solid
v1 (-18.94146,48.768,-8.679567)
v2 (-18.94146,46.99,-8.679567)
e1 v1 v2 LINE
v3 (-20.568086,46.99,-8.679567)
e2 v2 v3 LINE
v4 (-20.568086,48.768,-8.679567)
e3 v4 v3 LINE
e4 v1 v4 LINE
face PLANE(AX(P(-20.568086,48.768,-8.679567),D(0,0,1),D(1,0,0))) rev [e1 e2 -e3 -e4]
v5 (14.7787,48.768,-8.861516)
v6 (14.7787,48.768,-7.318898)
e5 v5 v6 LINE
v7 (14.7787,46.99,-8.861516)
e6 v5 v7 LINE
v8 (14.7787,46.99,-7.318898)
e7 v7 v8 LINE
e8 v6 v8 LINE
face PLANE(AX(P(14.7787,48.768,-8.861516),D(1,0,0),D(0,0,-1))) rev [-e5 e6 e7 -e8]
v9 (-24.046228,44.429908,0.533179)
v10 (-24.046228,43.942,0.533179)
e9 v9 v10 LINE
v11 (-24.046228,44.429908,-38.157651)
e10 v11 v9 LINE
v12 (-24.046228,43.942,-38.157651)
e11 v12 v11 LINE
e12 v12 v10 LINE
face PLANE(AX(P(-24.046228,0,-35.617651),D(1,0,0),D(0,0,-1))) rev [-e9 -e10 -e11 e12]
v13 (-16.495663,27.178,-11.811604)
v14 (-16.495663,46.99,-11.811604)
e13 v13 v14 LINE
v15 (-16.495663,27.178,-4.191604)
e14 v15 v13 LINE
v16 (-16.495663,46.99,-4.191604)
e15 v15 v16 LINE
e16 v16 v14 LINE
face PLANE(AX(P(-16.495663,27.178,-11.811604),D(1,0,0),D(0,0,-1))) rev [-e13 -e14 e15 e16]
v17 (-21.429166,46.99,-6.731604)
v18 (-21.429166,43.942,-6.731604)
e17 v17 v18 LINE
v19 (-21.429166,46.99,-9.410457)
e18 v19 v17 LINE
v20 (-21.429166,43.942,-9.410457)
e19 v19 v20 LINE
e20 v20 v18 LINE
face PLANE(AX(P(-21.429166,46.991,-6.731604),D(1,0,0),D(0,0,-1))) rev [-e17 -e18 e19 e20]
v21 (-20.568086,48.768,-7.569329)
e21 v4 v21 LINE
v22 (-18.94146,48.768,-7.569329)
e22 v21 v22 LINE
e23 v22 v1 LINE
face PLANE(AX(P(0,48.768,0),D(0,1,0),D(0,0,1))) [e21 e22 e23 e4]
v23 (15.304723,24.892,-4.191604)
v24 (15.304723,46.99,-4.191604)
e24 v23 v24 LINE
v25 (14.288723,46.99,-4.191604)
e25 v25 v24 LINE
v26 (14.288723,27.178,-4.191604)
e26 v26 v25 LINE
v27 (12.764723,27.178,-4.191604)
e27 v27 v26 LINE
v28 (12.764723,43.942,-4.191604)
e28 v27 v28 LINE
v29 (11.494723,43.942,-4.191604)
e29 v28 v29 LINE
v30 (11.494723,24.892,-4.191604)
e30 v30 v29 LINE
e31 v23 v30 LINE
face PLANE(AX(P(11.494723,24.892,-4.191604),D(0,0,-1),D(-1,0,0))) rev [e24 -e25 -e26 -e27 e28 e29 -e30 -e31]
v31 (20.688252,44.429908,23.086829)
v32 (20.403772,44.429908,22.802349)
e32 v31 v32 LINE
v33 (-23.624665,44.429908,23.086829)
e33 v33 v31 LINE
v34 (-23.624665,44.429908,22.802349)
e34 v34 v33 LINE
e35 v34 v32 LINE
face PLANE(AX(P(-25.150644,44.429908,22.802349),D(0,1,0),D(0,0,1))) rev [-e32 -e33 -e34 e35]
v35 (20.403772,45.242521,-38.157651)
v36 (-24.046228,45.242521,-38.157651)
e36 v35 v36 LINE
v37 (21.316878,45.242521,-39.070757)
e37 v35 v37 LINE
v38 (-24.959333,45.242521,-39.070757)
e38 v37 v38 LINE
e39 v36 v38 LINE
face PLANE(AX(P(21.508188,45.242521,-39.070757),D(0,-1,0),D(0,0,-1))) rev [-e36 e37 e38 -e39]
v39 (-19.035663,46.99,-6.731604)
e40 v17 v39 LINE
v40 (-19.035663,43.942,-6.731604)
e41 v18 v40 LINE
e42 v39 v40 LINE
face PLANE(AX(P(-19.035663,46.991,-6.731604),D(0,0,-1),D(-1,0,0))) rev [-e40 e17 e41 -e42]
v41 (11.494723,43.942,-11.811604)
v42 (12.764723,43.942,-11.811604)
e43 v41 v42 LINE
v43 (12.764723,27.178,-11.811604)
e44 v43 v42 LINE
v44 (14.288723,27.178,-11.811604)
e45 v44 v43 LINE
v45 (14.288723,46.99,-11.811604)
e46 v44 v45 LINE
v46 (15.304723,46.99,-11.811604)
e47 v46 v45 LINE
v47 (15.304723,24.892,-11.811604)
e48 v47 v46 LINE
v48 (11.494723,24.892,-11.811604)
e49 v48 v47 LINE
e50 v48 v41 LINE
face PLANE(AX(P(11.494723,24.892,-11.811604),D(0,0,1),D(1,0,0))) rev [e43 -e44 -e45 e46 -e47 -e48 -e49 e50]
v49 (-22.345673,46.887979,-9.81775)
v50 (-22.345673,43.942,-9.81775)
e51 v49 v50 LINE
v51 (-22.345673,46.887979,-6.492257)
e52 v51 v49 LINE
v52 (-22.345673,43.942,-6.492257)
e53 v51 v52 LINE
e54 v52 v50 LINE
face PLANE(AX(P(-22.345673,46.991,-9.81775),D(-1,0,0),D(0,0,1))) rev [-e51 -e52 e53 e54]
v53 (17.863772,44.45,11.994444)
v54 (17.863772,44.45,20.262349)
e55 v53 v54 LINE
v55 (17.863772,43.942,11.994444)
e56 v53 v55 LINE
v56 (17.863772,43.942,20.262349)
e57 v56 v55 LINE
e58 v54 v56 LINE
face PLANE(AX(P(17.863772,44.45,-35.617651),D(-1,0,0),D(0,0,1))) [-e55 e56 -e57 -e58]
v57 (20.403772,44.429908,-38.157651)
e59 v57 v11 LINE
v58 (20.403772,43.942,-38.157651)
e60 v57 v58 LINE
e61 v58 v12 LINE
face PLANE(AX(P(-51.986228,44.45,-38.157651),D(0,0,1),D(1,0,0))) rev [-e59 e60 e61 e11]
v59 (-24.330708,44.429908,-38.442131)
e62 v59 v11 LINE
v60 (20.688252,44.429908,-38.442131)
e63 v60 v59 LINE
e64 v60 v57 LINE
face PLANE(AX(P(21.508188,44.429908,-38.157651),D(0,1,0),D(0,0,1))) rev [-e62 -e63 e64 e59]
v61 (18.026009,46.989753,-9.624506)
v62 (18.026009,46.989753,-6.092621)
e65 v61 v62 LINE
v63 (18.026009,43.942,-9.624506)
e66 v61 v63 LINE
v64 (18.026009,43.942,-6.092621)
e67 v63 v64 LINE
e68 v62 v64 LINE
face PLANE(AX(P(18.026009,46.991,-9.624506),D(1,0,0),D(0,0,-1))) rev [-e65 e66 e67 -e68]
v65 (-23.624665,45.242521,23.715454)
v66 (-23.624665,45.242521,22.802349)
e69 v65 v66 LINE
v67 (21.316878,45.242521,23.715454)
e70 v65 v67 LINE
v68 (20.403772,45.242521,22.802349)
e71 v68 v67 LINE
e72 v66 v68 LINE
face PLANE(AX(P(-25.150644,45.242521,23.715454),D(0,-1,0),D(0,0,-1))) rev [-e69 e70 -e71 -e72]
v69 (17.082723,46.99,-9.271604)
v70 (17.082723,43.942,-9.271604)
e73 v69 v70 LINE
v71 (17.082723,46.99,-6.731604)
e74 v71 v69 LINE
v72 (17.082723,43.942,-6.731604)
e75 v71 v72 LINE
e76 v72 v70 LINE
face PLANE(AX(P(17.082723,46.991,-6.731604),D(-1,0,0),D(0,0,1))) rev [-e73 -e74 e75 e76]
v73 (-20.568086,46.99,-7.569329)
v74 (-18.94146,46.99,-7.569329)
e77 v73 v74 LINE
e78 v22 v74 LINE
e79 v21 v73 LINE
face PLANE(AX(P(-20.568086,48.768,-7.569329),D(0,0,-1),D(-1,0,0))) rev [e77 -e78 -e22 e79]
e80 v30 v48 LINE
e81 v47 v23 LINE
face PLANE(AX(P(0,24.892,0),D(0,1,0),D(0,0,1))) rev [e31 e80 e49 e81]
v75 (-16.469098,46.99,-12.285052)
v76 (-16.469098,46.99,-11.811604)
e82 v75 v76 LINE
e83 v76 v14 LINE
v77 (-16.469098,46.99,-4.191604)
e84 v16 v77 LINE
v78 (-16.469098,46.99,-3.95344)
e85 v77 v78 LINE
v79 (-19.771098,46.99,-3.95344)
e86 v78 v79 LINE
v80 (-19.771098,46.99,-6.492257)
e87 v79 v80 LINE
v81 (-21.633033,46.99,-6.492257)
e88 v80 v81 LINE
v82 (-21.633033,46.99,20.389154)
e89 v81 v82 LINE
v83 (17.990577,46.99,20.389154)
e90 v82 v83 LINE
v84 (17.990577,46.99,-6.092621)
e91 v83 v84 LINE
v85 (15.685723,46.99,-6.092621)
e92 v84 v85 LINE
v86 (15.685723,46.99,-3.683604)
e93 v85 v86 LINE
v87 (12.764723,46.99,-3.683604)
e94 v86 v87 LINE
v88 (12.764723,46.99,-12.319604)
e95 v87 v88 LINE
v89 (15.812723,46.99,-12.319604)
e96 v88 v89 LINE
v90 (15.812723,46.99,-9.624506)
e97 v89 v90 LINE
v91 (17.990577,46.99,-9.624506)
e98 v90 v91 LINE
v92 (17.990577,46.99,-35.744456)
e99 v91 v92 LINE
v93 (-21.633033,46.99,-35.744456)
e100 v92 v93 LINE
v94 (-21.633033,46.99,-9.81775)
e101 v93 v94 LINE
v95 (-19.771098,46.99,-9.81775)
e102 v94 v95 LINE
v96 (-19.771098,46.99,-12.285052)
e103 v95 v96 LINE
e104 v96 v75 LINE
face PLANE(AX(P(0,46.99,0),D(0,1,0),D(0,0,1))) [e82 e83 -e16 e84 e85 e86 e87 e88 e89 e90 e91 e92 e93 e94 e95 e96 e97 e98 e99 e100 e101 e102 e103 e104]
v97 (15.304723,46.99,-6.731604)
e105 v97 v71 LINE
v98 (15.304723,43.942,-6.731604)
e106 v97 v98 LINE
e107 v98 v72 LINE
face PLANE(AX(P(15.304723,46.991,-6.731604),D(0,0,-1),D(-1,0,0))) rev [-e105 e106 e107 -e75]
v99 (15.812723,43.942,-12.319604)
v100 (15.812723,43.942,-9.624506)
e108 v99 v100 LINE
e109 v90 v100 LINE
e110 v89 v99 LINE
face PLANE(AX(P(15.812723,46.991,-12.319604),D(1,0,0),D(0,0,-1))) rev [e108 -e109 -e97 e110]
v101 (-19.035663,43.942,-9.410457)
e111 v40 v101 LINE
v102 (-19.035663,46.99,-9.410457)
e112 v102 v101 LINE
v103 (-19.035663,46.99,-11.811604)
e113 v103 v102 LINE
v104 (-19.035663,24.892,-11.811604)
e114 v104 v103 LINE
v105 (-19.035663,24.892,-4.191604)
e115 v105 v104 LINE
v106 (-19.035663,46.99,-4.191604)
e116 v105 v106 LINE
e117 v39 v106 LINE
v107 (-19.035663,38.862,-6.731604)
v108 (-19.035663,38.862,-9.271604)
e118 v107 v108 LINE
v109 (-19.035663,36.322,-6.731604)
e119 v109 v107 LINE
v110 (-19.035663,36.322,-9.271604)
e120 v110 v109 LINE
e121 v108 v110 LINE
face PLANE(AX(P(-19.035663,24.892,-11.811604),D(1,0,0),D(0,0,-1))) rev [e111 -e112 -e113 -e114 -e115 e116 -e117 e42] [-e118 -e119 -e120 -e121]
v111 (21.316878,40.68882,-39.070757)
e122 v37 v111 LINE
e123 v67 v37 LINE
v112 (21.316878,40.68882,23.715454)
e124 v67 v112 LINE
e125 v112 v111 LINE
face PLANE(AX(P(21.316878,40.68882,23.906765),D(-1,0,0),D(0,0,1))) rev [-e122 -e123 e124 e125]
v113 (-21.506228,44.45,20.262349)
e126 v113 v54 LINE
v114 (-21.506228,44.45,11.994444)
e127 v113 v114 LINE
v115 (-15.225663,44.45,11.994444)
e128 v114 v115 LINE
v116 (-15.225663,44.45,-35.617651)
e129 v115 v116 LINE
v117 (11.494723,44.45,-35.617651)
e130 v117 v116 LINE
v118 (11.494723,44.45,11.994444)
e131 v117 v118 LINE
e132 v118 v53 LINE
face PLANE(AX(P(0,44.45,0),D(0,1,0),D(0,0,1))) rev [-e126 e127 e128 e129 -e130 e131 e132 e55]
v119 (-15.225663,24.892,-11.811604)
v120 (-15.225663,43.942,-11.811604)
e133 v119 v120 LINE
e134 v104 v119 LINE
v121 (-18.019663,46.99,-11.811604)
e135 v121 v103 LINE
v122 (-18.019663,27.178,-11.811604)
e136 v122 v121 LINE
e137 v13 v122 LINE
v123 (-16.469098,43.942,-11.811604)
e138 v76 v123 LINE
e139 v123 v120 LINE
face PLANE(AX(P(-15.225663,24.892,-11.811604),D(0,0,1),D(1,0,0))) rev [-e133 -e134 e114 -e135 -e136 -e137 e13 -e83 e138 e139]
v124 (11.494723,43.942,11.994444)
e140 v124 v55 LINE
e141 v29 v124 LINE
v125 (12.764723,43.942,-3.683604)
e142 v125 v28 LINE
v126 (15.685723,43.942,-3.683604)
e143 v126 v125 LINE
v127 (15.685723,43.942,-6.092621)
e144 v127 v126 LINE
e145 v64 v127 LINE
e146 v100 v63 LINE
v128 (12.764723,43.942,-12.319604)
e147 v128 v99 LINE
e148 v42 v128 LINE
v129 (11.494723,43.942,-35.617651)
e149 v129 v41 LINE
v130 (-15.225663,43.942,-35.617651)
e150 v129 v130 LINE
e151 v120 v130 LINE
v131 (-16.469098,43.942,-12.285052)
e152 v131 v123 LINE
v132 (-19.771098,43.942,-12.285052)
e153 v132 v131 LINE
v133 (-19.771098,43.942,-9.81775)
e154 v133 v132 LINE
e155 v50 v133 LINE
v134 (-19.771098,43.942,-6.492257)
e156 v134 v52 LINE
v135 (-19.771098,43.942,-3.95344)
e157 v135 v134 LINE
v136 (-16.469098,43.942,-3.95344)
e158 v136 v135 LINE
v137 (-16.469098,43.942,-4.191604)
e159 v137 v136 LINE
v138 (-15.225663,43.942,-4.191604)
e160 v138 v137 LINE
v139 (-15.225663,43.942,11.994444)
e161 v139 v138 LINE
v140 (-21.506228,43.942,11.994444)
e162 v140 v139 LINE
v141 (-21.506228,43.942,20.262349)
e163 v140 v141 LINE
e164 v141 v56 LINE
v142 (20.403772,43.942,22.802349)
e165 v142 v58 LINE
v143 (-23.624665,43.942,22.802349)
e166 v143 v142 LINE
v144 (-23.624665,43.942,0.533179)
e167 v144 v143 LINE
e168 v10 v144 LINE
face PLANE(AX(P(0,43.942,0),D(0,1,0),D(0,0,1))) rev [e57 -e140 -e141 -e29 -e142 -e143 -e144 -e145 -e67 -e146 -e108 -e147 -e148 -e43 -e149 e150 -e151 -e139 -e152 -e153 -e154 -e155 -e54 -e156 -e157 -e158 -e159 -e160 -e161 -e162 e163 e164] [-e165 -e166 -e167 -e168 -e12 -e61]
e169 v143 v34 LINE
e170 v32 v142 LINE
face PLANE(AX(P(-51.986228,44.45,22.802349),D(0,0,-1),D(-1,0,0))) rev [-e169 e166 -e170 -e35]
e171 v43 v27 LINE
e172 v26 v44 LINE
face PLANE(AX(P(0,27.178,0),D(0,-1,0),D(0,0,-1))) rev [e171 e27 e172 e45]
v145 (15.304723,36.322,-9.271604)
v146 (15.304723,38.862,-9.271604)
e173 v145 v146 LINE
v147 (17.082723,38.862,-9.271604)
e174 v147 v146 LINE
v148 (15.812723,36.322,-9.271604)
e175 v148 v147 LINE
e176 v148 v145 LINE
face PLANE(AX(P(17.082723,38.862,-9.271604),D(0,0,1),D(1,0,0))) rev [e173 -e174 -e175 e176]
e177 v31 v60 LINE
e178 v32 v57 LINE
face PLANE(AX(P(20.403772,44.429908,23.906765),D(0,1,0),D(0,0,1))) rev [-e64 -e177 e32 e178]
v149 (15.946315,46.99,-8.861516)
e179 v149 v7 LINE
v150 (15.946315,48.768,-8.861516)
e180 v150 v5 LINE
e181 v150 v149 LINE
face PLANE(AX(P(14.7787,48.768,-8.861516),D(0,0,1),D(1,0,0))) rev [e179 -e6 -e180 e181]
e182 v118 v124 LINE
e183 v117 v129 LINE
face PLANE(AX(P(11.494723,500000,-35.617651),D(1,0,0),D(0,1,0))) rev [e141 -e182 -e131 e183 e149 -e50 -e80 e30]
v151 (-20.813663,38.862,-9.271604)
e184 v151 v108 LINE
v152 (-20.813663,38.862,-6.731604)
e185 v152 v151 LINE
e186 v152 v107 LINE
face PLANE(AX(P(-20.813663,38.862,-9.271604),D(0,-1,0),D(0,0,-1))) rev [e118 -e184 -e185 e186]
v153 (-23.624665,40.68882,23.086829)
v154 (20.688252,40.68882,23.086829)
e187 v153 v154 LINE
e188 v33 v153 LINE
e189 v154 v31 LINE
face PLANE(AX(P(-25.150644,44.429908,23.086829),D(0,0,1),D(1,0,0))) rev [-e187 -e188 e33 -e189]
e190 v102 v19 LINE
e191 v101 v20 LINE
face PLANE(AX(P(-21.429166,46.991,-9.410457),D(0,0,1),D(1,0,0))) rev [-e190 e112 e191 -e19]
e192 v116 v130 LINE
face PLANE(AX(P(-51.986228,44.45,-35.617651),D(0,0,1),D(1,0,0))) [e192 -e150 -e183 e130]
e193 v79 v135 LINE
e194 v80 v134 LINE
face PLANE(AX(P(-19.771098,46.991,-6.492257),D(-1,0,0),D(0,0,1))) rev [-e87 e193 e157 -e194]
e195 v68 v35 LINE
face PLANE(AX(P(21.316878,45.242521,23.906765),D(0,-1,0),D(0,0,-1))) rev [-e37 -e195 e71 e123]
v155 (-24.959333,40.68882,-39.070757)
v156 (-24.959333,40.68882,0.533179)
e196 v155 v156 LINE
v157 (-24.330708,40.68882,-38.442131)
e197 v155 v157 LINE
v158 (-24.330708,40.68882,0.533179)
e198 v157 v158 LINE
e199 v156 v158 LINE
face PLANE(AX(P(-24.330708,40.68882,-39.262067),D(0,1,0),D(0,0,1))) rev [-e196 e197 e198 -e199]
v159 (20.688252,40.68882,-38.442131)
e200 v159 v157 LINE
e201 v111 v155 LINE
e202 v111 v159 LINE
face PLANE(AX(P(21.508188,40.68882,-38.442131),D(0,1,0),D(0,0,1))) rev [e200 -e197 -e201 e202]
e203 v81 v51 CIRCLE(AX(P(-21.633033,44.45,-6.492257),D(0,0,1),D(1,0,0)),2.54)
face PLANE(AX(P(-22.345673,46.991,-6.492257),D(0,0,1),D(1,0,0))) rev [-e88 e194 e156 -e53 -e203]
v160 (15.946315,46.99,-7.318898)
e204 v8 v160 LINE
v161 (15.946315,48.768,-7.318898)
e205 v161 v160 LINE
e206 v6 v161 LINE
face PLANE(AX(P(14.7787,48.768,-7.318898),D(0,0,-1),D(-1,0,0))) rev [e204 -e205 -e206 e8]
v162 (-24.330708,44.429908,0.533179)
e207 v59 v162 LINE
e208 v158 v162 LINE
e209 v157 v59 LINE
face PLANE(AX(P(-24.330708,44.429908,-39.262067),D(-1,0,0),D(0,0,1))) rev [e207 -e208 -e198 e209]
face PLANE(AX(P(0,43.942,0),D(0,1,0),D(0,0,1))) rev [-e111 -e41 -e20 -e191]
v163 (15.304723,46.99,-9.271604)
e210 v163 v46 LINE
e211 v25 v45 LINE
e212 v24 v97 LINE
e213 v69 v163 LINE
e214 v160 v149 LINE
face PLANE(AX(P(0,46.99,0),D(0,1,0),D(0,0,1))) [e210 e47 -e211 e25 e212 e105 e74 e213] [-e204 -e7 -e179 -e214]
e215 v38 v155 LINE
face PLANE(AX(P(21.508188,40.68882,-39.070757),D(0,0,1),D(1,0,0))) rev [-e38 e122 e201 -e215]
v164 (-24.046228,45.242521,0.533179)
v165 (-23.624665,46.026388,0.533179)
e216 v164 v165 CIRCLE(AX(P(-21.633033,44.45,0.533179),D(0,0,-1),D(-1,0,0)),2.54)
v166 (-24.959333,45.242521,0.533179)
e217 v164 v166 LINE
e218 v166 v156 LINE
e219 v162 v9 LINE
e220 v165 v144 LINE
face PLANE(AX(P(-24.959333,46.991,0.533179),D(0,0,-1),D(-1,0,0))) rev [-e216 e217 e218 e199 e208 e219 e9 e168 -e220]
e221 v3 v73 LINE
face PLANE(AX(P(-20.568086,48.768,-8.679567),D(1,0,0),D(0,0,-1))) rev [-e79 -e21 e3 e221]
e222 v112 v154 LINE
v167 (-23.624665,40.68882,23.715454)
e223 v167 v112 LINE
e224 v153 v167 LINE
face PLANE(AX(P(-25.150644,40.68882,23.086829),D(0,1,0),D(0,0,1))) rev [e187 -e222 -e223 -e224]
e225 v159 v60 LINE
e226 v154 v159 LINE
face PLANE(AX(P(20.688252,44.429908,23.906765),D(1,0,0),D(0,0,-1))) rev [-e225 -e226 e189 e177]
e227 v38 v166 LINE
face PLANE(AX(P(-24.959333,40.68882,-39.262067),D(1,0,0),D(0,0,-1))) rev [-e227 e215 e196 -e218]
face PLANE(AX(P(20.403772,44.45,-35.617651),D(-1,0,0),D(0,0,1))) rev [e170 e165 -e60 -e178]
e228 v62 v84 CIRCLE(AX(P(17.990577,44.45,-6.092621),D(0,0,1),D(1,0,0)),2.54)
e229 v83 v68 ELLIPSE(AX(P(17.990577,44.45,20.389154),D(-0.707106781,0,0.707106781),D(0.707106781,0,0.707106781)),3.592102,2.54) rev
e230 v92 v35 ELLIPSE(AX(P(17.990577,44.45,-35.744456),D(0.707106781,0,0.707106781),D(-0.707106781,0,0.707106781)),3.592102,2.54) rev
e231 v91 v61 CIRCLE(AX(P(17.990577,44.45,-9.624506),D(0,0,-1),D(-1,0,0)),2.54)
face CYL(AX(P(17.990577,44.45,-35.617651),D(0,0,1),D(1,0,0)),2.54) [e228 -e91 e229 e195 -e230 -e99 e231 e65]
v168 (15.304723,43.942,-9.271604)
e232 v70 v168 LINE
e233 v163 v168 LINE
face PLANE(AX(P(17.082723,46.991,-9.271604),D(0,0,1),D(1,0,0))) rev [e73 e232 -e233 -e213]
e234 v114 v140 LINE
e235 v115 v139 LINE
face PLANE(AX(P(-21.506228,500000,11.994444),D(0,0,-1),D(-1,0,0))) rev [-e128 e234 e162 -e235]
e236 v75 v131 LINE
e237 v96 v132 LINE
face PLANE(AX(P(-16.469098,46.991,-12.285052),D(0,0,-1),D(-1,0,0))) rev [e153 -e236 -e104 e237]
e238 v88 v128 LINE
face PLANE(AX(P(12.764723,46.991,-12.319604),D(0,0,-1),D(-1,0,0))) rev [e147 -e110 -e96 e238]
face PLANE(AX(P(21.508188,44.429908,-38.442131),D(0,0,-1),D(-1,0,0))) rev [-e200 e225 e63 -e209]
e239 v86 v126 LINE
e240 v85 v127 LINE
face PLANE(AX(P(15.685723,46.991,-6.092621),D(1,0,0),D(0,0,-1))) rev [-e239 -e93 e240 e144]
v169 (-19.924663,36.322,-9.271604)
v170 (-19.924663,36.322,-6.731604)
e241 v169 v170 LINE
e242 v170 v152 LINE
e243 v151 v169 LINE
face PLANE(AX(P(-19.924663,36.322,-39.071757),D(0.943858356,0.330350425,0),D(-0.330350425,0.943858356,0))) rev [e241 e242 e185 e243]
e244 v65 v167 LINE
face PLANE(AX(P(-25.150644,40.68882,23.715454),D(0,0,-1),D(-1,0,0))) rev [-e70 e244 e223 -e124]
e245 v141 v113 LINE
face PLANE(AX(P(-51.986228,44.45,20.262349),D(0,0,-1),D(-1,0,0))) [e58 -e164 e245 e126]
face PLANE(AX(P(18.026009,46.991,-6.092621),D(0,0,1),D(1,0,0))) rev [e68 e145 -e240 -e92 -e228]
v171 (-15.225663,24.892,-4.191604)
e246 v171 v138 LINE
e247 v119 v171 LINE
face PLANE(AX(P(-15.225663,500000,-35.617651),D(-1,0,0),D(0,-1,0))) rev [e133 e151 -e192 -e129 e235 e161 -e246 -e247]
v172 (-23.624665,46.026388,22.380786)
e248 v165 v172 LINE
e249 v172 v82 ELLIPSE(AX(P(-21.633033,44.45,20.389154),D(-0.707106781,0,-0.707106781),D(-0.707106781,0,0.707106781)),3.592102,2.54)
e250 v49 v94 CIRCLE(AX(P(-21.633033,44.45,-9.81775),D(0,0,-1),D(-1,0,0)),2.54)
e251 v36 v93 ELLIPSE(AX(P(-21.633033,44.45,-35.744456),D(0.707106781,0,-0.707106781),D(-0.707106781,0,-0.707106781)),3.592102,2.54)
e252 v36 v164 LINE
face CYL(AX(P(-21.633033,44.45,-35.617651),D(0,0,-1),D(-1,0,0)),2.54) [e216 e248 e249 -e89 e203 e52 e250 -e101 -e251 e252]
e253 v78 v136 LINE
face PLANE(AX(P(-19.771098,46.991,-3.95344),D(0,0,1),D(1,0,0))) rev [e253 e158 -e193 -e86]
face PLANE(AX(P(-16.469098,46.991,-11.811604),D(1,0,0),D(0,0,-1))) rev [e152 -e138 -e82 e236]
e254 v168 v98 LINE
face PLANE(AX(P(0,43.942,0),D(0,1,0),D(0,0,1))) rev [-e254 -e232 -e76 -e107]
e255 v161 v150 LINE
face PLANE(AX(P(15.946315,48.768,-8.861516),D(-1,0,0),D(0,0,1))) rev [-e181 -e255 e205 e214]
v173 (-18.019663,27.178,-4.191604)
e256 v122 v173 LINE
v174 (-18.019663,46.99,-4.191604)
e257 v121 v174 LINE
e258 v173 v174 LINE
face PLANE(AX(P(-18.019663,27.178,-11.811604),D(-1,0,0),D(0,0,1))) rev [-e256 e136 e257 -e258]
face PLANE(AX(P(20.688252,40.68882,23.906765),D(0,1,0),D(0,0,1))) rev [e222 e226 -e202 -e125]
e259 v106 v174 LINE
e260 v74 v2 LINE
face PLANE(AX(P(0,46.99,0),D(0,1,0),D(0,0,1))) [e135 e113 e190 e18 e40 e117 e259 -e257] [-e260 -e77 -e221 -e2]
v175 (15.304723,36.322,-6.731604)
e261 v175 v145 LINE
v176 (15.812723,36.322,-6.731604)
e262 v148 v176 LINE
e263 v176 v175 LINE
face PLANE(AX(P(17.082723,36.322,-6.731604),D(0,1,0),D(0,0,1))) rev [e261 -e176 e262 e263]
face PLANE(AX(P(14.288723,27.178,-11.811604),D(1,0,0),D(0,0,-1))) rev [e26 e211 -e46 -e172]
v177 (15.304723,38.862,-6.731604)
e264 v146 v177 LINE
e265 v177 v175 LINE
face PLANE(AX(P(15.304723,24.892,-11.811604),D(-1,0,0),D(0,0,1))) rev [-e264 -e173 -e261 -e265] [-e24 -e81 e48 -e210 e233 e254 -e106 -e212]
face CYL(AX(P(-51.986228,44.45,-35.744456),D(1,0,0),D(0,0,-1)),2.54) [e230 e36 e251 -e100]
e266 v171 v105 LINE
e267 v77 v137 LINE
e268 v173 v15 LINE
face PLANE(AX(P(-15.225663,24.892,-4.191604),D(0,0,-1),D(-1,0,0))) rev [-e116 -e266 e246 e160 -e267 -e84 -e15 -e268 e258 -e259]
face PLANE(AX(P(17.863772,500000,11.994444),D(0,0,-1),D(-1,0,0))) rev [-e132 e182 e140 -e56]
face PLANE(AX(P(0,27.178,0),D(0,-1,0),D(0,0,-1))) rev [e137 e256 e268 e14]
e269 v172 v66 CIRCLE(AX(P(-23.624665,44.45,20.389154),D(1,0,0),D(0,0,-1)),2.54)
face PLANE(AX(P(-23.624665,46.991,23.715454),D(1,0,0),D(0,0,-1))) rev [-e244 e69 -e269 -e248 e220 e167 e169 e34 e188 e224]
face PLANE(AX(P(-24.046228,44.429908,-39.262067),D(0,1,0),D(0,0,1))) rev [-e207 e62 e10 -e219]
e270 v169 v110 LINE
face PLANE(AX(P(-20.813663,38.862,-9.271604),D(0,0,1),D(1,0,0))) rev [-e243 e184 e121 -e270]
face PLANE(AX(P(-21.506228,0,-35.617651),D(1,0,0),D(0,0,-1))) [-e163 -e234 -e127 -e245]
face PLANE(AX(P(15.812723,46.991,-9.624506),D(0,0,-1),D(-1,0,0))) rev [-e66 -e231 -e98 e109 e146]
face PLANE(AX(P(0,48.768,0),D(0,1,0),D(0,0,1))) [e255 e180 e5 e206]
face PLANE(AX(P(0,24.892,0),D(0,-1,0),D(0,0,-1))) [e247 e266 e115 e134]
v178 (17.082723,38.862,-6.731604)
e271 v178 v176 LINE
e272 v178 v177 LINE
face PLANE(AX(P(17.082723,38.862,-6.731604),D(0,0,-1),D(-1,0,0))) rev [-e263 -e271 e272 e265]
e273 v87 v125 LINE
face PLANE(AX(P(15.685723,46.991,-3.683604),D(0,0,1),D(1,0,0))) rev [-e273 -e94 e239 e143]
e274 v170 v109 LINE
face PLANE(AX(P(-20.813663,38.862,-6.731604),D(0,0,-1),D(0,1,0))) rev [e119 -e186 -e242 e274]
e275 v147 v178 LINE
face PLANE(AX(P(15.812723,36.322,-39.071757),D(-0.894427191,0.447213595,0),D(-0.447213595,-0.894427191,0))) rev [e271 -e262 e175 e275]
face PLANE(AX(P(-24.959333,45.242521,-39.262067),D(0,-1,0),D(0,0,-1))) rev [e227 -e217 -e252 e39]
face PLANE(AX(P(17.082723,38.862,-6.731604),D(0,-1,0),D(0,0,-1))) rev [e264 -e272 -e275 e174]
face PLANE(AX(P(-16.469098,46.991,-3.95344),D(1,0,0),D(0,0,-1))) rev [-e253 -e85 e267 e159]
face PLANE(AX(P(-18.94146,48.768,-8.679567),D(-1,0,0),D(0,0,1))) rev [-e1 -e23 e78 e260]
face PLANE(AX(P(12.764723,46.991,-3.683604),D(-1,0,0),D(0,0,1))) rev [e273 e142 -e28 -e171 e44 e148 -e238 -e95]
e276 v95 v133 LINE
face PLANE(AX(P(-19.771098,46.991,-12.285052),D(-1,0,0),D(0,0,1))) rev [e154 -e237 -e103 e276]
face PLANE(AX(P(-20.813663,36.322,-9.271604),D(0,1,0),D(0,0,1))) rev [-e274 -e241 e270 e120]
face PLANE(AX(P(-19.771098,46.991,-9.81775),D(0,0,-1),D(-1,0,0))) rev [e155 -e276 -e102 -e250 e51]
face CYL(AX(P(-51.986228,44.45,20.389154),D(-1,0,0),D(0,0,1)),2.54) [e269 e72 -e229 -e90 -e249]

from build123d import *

# Parameters (mm, degrees)
STOCK_TOP_1_START                              = 44.45
STOCK_TOP_1_OUTLINE_W                          = 44.45
STOCK_TOP_1_OUTLINE_H                          = 60.96
STOCK_TOP_1_DEPTH                              = 2.54
STOCK_TOP_1_START_2                            = 43.942
STOCK_TOP_1_2_OUTLINE_W                        = 44.45
STOCK_TOP_1_2_OUTLINE_H                        = 60.96
STOCK_TOP_1_2_DEPTH                            = 0.508
OUTSIDE_FILLET_R                               = 2.54
CUT_A_BIT_OF_THE_ENCLOSURE_REACH               = 48.789
SKETCH1_W                                      = 1.334667882
SKETCH1_H                                      = 23.182275167
SKETCH2_W                                      = 3.81
SKETCH2_H                                      = 7.62
BATTERY_LID_1_DEPTH                            = 19.05
SKETCH3_W                                      = 2.54
SKETCH3_H                                      = 2.54
BATTERY_LID_HOLE_1_DEPTH                       = 1.778
CUT_EXTRUDE1_REACH                             = 64.264
SKETCH5_W                                      = 2.54
SKETCH5_H                                      = 2.54
BATTERY_LID_HOLE_2_DEPTH                       = 1.778
CUT_EXTRUDE2_REACH                             = 64.264
DETACH_LID_ATTACHEMENTS_REACH                  = 52.124
SKETCH9_W                                      = 1.524
SKETCH9_H                                      = 7.62
REMOVE_THE_INNARDS_OF_THE_LID_ATTACHMENT_DEPTH = 19.812
SKETCH11_W                                     = 1.167614697
SKETCH11_H                                     = 1.542617542
SKETCH11_W_2                                   = 1.626626063
SKETCH11_H_2                                   = 1.11023807
BOSS_EXTRUDE4_DEPTH                            = 1.778


# Read off the part's stored shape, not the designer's step: Stock-Top-1
with BuildPart() as part:
    # Stock-Top-1 outline → Stock-Top-1 (new body)
    with BuildSketch(Plane(origin=(0, 0, 0), x_dir=(1, 0, 0), z_dir=(0, 1, 0)).offset(STOCK_TOP_1_START)):
        with Locations((-1.821227893, 7.677651333)):
            Rectangle(STOCK_TOP_1_OUTLINE_W, STOCK_TOP_1_OUTLINE_H)
    extrude(amount=STOCK_TOP_1_DEPTH)

    # Stock-Top-1 2 outline → Stock-Top-1 2 (add)
    with BuildSketch(Plane(origin=(0, 0, 0), x_dir=(1, 0, 0), z_dir=(0, 1, 0)).offset(STOCK_TOP_1_START_2)):
        with Locations((-1.821227893, 7.677651333)):
            Rectangle(STOCK_TOP_1_2_OUTLINE_W, STOCK_TOP_1_2_OUTLINE_H)
        Polygon((11.494723241, -11.994444065), (17.863772107, -11.994444065), (17.863772107, -20.262348667), (-21.506227893, -20.262348667), (-21.506227893, -11.994444065), (-15.225663022, -11.994444065), (-15.225663022, 35.617651333), (11.494723241, 35.617651333), align=None, mode=Mode.SUBTRACT)
    extrude(amount=STOCK_TOP_1_2_DEPTH)

    # Enclosure: sweep along a path in Outline of Enclosure
    with BuildLine(Plane.XZ.offset(-43.942)) as enclosure_path:
        Line((-24.046227893, 22.802348667), (-24.046227893, -38.157651333))
        Line((-24.046227893, -38.157651333), (20.403772107, -38.157651333))
        Line((20.403772107, -38.157651333), (20.403772107, 22.802348667))
        Line((20.403772107, 22.802348667), (-24.046227893, 22.802348667))
    # Shape of Enclosure → Enclosure (sweep)
    with BuildSketch(Plane(origin=(20.403772107, 0, 0), x_dir=(0, 0, -1), z_dir=(1, 0, 0))):
        Polygon((38.157651333, 44.429907846), (38.442131333, 44.429907846), (38.442131333, 40.688820131), (39.070756728, 40.688820131), (39.070756728, 45.242521161), (38.157651333, 45.242521161), align=None)
    sweep(path=enclosure_path.line, transition=Transition.RIGHT)

    # Outside Fillet
    # the kernel refuses this fillet: 2.54 mm, written as the material it takes off along each edge
    with BuildSketch(Plane(origin=(20.403772107, 46.99, 28.835336218), x_dir=(2.8274047493178717e-10, -1.0, 0), z_dir=(0, 0, -1))) as outside_fillet_piece_1:
        with BuildLine():
            CenterArc((2.539999999, 2.413195021), OUTSIDE_FILLET_R, 180.000000016, 71.819221529)
            Line((-1e-09, 2.41319502), (-0.050800001, 2.41319502))
            Line((-0.050800001, 2.41319502), (-0.0508, 0))
            Line((-0.0508, 0), (0, -0.0508))
            ThreePointArc((0, -0.0508), (0.873739419, -0.0508), (1.731628415, -0.0482639))
            Line((1.731628415, -0.0482639), (1.747478839, 0))
        make_face()
    extrude(amount=73.025975102, mode=Mode.SUBTRACT)
    with BuildSketch(Plane(origin=(-24.046227893, 46.99, -44.190638886), x_dir=(2.827486071359672e-10, -1.0, 0), z_dir=(0, 0, 1))) as outside_fillet_piece_2:
        with BuildLine():
            CenterArc((2.540000001, 2.413195021), OUTSIDE_FILLET_R, 179.999999984, 71.819221529)
            Line((1e-09, 2.413195021), (-0.050799999, 2.413195021))
            Line((-0.050799999, 2.413195021), (-0.0508, 0))
            Line((-0.0508, 0), (0, -0.0508))
            ThreePointArc((0, -0.0508), (0.873739419, -0.0508), (1.731628415, -0.0482639))
            Line((1.731628415, -0.0482639), (1.747478839, 0))
        make_face()
    extrude(amount=73.025975107, mode=Mode.SUBTRACT)
    with BuildSketch(Plane(origin=(-30.079215446, 46.99, 22.802348667), x_dir=(0, -1.0, -1.349945893887387e-10), z_dir=(1, 0, 0))) as outside_fillet_piece_3:
        with BuildLine():
            CenterArc((2.54, 2.413195021), OUTSIDE_FILLET_R, 179.999999992, 71.819221529)
            Line((0, 2.413195021), (-0.0508, 2.413195021))
            Line((-0.0508, 2.413195021), (-0.0508, 0))
            Line((-0.0508, 0), (0, -0.0508))
            ThreePointArc((0, -0.0508), (0.873739419, -0.0508), (1.731628415, -0.0482639))
            Line((1.731628415, -0.0482639), (1.747478839, 0))
        make_face()
    extrude(amount=56.515975105, mode=Mode.SUBTRACT)
    with BuildSketch(Plane(origin=(26.436759659, 46.99, -38.157651333), x_dir=(0, 0, 1), z_dir=(-1, 0, 0))) as outside_fillet_piece_4:
        with BuildLine():
            CenterArc((2.413195021, -2.54), OUTSIDE_FILLET_R, 90, 71.819221529)
            Line((0, -1.747478839), (-0.048263901, -1.731628415))
            ThreePointArc((-0.048263901, -1.731628415), (-0.0508, -0.873739419), (-0.0508, 0))
            Line((-0.0508, 0), (0, 0.0508))
            Line((0, 0.0508), (2.413195021, 0.0508))
            Line((2.413195021, 0.0508), (2.413195021, 0))
        make_face()
    extrude(amount=56.515975103, mode=Mode.SUBTRACT)

    # Sketch1 → Cut a bit of the enclosure (cut, up to next)
    with BuildSketch(Plane.XZ.offset(-40.688820131), mode=Mode.PRIVATE) as cut_a_bit_of_the_enclosure_sk1:
        with Locations((-24.291999346, 12.124316479)):
            Rectangle(SKETCH1_W, SKETCH1_H)
    cut_a_bit_of_the_enclosure_tool1 = extrude(cut_a_bit_of_the_enclosure_sk1.sketch, amount=-CUT_A_BIT_OF_THE_ENCLOSURE_REACH, mode=Mode.PRIVATE) & part.part
    add(cut_a_bit_of_the_enclosure_tool1.solids().sort_by_distance((-24.291999, 40.68882, 12.124316))[0], mode=Mode.SUBTRACT)

    # Sketch2 → Battery lid 1 (add)
    with BuildSketch(Plane.XZ.offset(-43.942)):
        with Locations((-17.130663022, -8.001603634)):
            Rectangle(SKETCH2_W, SKETCH2_H)
        with Locations((13.399723241, -8.001603634)):
            Rectangle(SKETCH2_W, SKETCH2_H)
    extrude(amount=BATTERY_LID_1_DEPTH)

    # Sketch3 → Battery lid hole 1 (add)
    with BuildSketch(Plane.ZY.offset(19.035663022)):
        with Locations((-8.001603634, 37.592)):
            Rectangle(SKETCH3_W, SKETCH3_H)
    extrude(amount=BATTERY_LID_HOLE_1_DEPTH)

    # Sketch4 → Cut-Extrude1 (cut, up to next)
    with BuildSketch(Plane.XY.offset(-6.731603634), mode=Mode.PRIVATE) as cut_extrude1_sk1:
        Polygon((-20.813663022, 38.862), (-20.813663022, 36.322), (-19.924663022, 36.322), align=None)
    cut_extrude1_tool1 = extrude(cut_extrude1_sk1.sketch, amount=-CUT_EXTRUDE1_REACH, mode=Mode.PRIVATE) & part.part
    add(cut_extrude1_tool1.solids().sort_by_distance((-20.51733, 37.168667, -6.731604))[0], mode=Mode.SUBTRACT)

    # Sketch5 → Battery lid hole 2 (add)
    with BuildSketch(Plane(origin=(15.304723241, 0, 0), x_dir=(0, 0, -1), z_dir=(1, 0, 0))):
        with Locations((8.001603634, 37.592)):
            Rectangle(SKETCH5_W, SKETCH5_H)
    extrude(amount=BATTERY_LID_HOLE_2_DEPTH)

    # Sketch6 → Cut-Extrude2 (cut, up to next)
    with BuildSketch(Plane.XY.offset(-6.731603634), mode=Mode.PRIVATE) as cut_extrude2_sk1:
        Polygon((17.082723241, 38.862), (17.082723241, 36.322), (15.812723241, 36.322), align=None)
    cut_extrude2_tool1 = extrude(cut_extrude2_sk1.sketch, amount=-CUT_EXTRUDE2_REACH, mode=Mode.PRIVATE) & part.part
    add(cut_extrude2_tool1.solids().sort_by_distance((16.65939, 37.168667, -6.731604))[0], mode=Mode.SUBTRACT)

    # Sketch7 → Detach Lid attachements (cut, up to next)
    with BuildSketch(Plane.XZ.offset(-43.942), mode=Mode.PRIVATE) as detach_lid_attachements_sk1:
        Polygon((-16.469097924, -4.191603634), (-19.035663022, -4.191603634), (-19.035663022, -6.731603634), (-21.429165636, -6.731603634), (-21.429165636, -9.410456582), (-19.035663022, -9.410456582), (-19.035663022, -11.811603634), (-16.469097924, -11.811603634), (-16.469097924, -12.285051826), (-19.771097924, -12.285051826), (-19.771097924, -9.817750336), (-22.345673393, -9.817750336), (-22.345673393, -6.870456582), (-22.345673393, -6.492257022), (-19.771097924, -6.492257022), (-19.771097924, -3.953439546), (-16.469097924, -3.953439546), align=None)
    detach_lid_attachements_tool1 = extrude(detach_lid_attachements_sk1.sketch, amount=-DETACH_LID_ATTACHEMENTS_REACH, mode=Mode.PRIVATE) & part.part
    # Sketch7 → Detach Lid attachements (cut, up to next)
    with BuildSketch(Plane.XZ.offset(-43.942), mode=Mode.PRIVATE) as detach_lid_attachements_sk2:
        Polygon((12.764723241, -4.191603634), (15.304723241, -4.191603634), (15.304723241, -6.731603634), (17.082723241, -6.731603634), (17.082723241, -9.271603634), (15.304723241, -9.271603634), (15.304723241, -11.811603634), (12.764723241, -11.811603634), (12.764723241, -12.319603634), (15.812723241, -12.319603634), (15.812723241, -9.624506021), (18.02600878, -9.624506021), (18.02600878, -6.09262067), (15.685723241, -6.09262067), (15.685723241, -3.683603634), (12.764723241, -3.683603634), align=None)
    detach_lid_attachements_tool2 = extrude(detach_lid_attachements_sk2.sketch, amount=-DETACH_LID_ATTACHEMENTS_REACH, mode=Mode.PRIVATE) & part.part
    add(detach_lid_attachements_tool1.solids().sort_by_distance((-17.75238, 43.942, -4.089648))[0], mode=Mode.SUBTRACT)
    add(detach_lid_attachements_tool2.solids().sort_by_distance((14.034723, 43.942, -4.090479))[0], mode=Mode.SUBTRACT)

    # Sketch9 → Remove the innards of the lid attachment (cut)
    with BuildSketch(Plane(origin=(0, 46.99, 0), x_dir=(1, 0, 0), z_dir=(0, 1, 0))):
        with Locations((-17.257663022, 8.001603634)):
            Rectangle(SKETCH9_W, SKETCH9_H)
        with Locations((13.526723241, 8.001603634)):
            Rectangle(SKETCH9_W, SKETCH9_H)
    extrude(amount=-REMOVE_THE_INNARDS_OF_THE_LID_ATTACHMENT_DEPTH, mode=Mode.SUBTRACT)

    # Sketch11 → Boss-Extrude4 (add)
    with BuildSketch(Plane(origin=(0, 46.99, 0), x_dir=(1, 0, 0), z_dir=(0, 1, 0))):
        with Locations((15.362507718, 8.090206817)):
            Rectangle(SKETCH11_W, SKETCH11_H)
        with Locations((-19.754773261, 8.124447803)):
            Rectangle(SKETCH11_W_2, SKETCH11_H_2)
    extrude(amount=BOSS_EXTRUDE4_DEPTH)


solid = part.part
